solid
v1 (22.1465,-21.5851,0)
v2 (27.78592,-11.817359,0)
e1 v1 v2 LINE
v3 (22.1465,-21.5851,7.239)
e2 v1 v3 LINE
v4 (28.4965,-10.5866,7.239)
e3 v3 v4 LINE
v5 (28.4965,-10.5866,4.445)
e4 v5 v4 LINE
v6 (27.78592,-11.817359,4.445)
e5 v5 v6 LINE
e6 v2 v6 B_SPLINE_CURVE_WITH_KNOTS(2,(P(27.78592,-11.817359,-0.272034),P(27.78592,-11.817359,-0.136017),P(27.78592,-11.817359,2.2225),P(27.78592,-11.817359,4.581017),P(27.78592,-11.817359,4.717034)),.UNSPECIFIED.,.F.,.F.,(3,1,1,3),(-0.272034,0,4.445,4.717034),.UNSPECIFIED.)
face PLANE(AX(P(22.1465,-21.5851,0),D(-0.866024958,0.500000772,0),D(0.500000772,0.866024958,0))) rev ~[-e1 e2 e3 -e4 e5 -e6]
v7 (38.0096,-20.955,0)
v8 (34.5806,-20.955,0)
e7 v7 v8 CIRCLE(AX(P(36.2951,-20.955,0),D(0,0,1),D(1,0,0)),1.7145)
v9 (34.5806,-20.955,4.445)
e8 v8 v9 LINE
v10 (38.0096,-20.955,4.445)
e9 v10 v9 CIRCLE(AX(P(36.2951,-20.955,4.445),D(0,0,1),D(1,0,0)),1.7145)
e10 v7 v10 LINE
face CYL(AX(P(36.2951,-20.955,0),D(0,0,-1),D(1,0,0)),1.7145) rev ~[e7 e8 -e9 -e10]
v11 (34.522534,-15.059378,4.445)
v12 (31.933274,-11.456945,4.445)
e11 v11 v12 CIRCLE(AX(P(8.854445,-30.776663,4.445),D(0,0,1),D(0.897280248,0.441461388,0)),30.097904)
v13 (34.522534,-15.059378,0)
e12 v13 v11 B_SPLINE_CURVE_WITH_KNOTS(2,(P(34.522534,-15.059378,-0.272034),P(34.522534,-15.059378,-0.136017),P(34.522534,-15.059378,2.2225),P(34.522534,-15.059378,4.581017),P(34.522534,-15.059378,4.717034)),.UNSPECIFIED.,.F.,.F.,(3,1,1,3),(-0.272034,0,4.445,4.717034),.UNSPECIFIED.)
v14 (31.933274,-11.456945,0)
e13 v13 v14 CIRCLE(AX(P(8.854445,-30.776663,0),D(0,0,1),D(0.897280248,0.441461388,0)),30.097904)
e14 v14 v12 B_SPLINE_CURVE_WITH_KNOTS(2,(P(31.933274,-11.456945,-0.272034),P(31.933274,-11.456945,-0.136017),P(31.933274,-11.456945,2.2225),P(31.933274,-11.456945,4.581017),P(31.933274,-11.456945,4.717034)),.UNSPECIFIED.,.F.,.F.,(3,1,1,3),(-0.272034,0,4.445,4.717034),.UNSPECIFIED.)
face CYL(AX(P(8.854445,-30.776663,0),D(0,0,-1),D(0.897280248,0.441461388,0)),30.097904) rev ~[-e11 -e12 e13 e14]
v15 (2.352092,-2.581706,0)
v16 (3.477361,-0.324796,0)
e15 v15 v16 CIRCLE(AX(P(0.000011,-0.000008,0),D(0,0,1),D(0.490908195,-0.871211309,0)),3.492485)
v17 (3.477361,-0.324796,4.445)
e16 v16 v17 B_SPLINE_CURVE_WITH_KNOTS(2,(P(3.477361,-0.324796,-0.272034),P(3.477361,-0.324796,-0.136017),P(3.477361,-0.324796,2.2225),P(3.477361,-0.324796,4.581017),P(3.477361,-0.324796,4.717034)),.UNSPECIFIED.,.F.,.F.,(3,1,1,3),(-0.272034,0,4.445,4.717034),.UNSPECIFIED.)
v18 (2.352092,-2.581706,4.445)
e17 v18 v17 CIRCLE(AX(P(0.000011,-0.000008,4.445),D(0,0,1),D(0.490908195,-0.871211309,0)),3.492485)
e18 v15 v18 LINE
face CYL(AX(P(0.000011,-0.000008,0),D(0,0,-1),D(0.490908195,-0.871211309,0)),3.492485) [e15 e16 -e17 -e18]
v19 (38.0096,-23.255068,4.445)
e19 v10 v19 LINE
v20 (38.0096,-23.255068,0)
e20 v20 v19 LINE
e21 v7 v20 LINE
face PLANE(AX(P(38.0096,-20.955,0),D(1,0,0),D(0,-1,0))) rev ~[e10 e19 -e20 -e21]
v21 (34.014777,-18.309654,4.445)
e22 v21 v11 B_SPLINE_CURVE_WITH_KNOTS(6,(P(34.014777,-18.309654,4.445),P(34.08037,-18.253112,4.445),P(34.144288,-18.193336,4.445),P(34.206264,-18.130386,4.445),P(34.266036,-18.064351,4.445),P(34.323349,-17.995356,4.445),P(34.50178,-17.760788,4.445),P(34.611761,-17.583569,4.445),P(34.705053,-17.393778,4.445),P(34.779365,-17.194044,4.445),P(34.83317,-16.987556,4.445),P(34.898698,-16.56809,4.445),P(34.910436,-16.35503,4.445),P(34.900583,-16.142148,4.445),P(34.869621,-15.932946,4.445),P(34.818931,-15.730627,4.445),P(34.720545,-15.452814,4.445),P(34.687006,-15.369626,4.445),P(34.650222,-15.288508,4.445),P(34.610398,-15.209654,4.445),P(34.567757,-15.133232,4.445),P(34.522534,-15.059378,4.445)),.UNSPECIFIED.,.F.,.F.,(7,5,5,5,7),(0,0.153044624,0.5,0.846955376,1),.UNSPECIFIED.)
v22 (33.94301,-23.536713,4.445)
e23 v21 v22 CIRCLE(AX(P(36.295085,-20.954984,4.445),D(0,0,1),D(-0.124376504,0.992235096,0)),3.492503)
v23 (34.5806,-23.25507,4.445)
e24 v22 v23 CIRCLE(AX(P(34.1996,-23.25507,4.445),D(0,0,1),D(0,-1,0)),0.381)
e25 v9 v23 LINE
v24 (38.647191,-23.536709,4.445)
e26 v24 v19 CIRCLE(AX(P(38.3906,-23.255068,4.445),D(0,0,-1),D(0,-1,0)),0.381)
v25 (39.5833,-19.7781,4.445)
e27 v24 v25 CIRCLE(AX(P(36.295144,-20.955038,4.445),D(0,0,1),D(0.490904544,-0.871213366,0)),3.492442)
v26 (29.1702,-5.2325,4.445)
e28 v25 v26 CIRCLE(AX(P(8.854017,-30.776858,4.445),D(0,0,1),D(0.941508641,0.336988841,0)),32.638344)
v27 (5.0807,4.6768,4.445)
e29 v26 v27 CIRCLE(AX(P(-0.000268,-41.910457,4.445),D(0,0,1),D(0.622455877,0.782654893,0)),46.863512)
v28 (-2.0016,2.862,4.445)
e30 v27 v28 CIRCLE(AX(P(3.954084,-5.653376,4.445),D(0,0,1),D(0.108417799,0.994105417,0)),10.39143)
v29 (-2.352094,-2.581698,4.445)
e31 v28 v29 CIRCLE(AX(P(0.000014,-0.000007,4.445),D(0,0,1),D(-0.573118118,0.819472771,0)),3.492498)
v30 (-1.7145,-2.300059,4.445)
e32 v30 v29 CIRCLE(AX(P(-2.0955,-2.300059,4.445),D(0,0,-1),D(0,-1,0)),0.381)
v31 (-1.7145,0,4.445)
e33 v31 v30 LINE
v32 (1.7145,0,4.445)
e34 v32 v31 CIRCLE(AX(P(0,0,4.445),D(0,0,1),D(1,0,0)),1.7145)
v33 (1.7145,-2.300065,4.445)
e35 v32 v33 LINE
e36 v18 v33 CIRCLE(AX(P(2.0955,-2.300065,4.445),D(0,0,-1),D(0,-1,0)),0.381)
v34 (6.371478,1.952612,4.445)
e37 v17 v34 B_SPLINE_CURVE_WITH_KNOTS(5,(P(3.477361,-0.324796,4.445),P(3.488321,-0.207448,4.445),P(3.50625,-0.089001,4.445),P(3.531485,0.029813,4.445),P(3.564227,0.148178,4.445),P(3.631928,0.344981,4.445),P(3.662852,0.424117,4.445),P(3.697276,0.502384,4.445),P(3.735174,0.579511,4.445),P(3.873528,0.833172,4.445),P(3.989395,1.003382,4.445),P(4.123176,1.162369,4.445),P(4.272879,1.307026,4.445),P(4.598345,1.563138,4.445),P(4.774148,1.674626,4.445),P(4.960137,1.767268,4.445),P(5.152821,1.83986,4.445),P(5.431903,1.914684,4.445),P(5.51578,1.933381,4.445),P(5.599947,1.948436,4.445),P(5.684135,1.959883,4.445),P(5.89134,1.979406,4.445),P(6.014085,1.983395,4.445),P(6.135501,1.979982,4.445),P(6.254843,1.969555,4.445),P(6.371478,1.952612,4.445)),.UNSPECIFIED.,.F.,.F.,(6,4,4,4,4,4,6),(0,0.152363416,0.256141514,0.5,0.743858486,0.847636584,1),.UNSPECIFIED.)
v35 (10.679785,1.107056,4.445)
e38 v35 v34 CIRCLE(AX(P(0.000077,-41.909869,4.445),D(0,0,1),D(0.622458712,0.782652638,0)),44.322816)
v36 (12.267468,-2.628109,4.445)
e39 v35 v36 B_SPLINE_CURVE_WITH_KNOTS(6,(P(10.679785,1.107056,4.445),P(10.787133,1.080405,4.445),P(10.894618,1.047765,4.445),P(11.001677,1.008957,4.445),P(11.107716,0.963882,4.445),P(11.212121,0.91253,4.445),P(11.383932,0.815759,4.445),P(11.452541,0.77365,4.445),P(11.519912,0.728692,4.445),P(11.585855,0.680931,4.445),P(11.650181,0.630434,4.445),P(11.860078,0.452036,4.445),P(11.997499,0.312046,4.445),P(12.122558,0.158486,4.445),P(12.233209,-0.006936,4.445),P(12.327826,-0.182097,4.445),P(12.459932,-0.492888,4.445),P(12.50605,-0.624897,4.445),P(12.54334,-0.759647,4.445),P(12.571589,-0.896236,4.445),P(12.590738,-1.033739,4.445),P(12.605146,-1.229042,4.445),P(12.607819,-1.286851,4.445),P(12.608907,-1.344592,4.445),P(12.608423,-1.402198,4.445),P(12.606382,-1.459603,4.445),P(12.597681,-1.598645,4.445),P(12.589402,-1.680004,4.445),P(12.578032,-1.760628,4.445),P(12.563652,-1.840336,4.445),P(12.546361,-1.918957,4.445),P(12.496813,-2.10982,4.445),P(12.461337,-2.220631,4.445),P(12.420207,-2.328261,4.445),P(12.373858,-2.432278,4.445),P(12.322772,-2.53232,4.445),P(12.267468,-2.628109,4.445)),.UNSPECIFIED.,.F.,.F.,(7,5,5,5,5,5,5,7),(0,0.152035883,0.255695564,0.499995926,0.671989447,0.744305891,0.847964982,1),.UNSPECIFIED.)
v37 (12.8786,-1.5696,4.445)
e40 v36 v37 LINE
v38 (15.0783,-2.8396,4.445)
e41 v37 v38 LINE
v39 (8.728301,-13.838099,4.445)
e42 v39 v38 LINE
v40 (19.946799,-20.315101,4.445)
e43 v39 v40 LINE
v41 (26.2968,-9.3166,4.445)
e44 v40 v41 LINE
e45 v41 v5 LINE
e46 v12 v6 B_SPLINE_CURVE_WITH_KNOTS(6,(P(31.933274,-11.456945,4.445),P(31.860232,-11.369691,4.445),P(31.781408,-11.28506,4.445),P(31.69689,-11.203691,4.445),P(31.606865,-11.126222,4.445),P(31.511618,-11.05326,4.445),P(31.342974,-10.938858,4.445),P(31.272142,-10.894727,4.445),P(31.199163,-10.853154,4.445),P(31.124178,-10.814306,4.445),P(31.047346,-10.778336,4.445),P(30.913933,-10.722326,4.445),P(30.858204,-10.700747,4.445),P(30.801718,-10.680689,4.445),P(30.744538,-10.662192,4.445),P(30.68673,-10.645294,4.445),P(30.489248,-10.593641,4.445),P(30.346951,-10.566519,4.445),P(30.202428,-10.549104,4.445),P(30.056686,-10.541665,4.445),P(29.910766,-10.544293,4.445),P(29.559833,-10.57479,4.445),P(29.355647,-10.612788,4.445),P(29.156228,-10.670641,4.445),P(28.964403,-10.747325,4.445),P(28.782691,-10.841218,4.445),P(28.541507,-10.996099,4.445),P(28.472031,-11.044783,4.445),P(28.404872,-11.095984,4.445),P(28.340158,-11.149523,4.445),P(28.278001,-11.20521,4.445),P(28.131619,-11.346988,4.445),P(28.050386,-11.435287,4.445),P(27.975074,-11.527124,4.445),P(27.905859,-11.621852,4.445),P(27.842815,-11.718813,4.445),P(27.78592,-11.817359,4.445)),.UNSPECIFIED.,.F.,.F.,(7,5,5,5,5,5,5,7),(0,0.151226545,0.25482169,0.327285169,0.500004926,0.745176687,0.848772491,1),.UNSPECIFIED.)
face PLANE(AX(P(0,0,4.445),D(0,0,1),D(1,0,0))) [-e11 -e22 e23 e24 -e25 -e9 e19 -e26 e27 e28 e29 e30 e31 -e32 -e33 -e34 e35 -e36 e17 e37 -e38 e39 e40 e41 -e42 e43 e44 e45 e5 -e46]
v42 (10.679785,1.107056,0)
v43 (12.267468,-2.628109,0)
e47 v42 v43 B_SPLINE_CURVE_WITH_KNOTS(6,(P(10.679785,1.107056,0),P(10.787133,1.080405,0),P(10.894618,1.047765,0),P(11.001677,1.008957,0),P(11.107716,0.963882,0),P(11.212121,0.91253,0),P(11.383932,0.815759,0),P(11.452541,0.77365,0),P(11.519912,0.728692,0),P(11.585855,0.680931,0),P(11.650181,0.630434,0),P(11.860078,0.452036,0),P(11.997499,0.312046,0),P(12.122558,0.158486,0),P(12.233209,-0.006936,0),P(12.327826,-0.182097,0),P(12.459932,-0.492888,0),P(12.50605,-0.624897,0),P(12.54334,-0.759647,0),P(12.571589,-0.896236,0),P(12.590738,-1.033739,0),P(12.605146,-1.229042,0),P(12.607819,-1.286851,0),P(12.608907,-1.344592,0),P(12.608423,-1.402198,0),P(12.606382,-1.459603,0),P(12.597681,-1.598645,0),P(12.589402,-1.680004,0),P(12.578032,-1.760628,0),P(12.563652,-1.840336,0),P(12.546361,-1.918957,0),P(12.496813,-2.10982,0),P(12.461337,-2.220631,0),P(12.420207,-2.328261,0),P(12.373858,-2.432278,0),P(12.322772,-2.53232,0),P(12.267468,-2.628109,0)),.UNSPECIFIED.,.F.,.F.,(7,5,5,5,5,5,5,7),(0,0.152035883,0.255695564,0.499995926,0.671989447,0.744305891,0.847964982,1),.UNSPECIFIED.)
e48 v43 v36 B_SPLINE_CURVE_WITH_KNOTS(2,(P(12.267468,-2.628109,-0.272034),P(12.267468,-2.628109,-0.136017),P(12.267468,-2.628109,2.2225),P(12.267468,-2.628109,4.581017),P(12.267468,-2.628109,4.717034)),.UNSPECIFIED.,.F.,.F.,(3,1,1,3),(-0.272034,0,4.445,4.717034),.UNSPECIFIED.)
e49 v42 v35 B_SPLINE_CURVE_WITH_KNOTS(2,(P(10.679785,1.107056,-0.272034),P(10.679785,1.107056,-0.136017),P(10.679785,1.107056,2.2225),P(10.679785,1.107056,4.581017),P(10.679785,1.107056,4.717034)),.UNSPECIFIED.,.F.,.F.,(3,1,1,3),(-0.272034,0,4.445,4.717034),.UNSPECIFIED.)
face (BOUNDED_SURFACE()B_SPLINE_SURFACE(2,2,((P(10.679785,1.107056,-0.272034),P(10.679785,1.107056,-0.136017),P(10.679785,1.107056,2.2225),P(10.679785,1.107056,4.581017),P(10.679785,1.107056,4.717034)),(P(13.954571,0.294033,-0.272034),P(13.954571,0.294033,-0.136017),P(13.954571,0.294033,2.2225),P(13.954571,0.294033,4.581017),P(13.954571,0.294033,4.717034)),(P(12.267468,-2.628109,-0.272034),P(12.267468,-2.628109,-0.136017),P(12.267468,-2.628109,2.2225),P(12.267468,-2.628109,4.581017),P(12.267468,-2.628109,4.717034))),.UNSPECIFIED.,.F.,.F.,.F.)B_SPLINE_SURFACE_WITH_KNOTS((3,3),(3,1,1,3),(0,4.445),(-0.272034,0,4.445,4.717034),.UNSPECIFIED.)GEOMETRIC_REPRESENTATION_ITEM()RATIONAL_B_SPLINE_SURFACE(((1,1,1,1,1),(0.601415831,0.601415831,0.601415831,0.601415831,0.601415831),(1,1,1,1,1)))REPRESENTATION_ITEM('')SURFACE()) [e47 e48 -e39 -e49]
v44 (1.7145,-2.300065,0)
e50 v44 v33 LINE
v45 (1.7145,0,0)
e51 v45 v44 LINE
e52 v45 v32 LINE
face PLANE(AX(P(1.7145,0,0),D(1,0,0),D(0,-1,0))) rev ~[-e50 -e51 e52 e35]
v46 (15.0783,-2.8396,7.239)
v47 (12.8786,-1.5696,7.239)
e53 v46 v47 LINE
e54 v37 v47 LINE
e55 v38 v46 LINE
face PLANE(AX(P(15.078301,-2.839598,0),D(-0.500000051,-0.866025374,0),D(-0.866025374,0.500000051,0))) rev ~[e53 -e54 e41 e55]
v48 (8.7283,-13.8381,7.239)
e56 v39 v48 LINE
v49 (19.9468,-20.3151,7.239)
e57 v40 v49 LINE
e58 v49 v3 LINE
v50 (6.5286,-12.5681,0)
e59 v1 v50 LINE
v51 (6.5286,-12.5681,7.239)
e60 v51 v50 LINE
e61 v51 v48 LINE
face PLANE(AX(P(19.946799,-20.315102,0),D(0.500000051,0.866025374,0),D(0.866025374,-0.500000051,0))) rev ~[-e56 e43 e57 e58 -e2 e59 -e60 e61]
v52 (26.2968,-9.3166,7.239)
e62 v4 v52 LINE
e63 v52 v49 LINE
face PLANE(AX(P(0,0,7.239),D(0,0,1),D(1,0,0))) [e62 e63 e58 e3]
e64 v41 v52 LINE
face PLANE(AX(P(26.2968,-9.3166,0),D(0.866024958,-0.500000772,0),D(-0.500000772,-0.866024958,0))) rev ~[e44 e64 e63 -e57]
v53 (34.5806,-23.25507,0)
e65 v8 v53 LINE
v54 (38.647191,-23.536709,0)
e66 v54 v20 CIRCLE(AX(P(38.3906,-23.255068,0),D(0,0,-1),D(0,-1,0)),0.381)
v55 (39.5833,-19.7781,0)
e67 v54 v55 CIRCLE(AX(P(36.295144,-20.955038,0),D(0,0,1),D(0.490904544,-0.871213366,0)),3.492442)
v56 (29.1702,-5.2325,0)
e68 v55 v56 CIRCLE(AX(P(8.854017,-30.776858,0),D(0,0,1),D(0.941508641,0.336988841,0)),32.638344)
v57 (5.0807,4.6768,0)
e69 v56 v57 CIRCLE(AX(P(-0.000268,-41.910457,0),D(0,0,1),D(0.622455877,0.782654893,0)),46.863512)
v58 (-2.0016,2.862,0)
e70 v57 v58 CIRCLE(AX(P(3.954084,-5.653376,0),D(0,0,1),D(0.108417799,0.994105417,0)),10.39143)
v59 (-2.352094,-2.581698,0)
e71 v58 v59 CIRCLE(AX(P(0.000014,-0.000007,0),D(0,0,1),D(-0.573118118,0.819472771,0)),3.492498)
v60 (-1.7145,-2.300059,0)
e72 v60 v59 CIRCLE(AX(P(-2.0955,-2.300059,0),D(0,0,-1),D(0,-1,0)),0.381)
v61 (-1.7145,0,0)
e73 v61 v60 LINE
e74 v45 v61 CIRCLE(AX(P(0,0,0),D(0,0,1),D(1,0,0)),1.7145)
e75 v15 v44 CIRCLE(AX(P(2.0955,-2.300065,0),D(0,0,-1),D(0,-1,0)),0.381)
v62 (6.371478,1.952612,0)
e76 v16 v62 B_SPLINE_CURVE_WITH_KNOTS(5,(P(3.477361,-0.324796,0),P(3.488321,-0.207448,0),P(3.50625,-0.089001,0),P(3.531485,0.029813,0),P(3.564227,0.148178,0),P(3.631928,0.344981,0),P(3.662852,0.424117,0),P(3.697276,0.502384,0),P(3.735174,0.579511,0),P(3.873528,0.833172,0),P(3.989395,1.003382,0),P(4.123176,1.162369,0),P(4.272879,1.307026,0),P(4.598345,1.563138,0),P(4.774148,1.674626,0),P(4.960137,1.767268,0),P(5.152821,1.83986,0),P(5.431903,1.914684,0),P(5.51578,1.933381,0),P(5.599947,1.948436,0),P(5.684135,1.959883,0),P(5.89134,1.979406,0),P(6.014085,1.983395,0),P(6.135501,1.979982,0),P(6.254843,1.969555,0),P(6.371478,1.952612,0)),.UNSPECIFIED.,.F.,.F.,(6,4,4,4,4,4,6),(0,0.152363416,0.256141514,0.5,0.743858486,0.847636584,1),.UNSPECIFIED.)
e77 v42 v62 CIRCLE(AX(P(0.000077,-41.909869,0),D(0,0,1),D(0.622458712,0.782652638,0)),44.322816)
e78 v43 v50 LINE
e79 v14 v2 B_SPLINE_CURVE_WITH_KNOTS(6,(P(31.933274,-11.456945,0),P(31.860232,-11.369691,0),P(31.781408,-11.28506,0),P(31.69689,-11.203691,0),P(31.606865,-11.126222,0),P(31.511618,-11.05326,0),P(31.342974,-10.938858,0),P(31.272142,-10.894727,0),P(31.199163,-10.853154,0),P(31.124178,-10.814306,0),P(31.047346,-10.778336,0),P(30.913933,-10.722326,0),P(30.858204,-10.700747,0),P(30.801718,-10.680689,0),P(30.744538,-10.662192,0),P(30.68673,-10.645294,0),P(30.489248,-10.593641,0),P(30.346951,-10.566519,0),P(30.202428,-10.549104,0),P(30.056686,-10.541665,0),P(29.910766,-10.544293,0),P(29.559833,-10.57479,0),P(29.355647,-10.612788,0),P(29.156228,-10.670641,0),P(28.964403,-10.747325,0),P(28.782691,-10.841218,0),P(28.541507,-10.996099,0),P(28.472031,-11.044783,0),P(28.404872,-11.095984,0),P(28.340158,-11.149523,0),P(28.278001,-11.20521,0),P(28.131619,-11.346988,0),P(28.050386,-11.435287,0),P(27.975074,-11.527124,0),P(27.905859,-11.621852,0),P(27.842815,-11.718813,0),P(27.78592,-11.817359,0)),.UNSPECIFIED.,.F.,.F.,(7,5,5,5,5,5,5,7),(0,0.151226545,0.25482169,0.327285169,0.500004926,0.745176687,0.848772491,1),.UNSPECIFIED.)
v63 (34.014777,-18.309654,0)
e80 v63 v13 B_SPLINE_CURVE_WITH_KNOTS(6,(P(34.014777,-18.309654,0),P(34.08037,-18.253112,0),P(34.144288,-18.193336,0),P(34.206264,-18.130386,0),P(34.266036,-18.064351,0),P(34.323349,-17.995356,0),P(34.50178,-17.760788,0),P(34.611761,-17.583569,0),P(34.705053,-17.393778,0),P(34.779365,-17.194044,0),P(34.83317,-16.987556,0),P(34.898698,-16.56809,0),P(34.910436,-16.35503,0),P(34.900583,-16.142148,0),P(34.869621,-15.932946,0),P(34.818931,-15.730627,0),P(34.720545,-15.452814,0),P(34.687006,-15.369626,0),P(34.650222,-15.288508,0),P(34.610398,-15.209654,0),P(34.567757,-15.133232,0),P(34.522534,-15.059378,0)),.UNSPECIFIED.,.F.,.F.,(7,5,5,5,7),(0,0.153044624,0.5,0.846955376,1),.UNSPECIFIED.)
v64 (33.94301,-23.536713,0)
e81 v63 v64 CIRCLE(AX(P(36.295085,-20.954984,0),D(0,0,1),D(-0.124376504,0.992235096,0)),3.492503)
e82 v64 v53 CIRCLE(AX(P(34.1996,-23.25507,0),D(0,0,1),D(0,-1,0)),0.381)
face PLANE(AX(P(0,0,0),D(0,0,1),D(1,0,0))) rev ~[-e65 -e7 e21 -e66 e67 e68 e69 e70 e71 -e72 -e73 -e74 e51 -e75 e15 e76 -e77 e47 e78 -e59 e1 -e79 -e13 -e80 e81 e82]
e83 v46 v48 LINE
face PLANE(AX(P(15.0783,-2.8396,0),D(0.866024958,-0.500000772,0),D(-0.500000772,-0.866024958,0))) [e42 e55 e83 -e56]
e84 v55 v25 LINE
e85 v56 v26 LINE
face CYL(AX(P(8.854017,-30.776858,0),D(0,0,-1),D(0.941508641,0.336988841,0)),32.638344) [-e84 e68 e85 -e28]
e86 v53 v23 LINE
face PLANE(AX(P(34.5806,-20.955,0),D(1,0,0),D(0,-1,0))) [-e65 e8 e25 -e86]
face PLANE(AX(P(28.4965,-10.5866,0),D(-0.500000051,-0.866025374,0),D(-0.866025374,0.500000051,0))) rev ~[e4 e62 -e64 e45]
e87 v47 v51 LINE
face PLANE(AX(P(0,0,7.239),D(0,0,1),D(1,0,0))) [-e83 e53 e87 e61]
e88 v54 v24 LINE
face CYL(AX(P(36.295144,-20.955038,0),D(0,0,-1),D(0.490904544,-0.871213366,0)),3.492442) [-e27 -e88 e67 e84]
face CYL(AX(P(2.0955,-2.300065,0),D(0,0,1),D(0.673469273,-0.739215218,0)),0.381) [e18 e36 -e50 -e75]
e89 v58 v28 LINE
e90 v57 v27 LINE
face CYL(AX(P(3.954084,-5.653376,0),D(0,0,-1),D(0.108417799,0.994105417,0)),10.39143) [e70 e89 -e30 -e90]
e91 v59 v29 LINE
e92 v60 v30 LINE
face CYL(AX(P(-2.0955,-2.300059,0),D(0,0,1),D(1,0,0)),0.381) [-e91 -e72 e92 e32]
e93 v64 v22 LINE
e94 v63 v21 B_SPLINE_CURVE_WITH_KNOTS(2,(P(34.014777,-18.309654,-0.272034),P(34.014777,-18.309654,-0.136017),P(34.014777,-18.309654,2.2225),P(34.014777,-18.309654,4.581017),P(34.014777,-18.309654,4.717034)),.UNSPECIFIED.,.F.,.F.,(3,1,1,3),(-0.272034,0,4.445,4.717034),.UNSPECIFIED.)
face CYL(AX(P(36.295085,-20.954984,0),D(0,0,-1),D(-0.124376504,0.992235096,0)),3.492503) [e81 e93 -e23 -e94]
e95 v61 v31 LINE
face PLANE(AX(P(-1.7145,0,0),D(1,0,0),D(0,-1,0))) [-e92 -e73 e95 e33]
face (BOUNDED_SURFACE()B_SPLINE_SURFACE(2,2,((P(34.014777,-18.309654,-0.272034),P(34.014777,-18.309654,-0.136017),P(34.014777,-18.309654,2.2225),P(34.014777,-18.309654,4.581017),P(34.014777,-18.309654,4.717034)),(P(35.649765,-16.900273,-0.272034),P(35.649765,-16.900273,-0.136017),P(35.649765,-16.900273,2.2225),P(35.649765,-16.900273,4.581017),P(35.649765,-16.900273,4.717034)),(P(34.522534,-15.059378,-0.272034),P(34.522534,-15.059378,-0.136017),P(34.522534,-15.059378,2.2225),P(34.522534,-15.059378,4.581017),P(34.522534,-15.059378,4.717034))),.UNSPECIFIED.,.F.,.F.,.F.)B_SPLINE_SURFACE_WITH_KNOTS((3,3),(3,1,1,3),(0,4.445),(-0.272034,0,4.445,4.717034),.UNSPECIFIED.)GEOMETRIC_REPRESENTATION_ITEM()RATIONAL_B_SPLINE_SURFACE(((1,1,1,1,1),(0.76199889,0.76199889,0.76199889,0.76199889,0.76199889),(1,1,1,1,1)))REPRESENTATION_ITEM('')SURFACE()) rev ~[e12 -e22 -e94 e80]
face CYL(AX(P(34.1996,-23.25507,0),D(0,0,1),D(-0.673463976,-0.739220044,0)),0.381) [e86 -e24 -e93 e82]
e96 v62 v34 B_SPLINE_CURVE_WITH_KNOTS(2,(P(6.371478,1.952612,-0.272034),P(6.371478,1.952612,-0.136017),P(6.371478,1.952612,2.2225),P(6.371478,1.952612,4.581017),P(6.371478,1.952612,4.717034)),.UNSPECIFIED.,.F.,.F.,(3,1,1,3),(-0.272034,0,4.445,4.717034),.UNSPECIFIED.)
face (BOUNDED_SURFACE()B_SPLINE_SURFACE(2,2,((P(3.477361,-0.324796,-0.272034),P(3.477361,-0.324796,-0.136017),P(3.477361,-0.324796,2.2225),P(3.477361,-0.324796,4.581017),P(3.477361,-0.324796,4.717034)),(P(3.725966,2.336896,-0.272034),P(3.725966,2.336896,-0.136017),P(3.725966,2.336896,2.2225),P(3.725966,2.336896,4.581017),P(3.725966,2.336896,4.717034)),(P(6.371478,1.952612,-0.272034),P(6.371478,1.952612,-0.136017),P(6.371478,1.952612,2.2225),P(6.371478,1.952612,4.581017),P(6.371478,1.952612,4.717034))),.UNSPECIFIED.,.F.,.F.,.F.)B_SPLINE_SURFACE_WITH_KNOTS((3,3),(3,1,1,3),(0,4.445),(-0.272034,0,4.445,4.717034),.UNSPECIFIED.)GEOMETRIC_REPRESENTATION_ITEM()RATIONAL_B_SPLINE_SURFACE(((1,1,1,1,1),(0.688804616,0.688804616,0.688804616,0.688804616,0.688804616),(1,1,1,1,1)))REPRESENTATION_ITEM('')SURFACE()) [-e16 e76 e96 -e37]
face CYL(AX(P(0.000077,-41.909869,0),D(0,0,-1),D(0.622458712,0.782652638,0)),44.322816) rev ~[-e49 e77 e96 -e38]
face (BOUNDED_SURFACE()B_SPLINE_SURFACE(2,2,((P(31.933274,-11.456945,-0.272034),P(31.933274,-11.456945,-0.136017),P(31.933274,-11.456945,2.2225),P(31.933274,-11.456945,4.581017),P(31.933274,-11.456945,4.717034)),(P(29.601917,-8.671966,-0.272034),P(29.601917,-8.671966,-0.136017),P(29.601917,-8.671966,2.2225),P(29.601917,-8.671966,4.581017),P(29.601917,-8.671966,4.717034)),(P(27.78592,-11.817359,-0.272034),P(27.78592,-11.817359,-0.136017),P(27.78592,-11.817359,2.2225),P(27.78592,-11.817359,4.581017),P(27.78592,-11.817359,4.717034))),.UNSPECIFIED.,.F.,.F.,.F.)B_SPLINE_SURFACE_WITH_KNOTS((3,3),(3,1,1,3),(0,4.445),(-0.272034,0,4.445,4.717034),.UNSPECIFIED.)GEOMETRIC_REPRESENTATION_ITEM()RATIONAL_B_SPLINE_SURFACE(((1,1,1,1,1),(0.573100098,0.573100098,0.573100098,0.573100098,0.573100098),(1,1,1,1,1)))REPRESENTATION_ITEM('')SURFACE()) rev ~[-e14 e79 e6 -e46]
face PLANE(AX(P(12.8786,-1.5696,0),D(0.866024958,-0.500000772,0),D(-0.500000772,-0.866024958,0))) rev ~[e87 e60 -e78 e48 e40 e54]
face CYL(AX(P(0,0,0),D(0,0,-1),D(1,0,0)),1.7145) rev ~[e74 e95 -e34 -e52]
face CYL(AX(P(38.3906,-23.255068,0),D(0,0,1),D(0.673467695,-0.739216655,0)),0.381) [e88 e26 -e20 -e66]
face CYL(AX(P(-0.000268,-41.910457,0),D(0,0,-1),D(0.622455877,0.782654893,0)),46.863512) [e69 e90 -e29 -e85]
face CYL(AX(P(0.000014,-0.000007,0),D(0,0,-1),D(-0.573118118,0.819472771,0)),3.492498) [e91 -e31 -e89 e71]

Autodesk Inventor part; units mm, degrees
ref_plane "YZ Plane" through (0, 0, 0) normal (1, 0, 0) x (0, 1, 0)
ref_plane "XZ Plane" through (0, 0, 0) normal (0, 1, 0) x (-1, 0, 0)
ref_plane "XY Plane" through (0, 0, 0) normal (0, 0, 1) x (1, 0, 0)
sketch "Sketch1" plane through (0, 0, 0) normal (0, 0, 1) x (1, 0, 0)
  arc A0 (1.7145, 0) -> (-1.7145, 0) centre (0, 0) ccw
  arc A1 (38.0096, -20.955) -> (34.5806, -20.955) centre (36.2951, -20.955) ccw
  line L0 (0, 0) -> (36.5724, 0) construction
  line L1 (-1.7145, 0) -> (-1.7145, -3.0427)
  line L2 (1.7145, 0) -> (1.7145, -3.0427)
  line L3 (34.5806, -20.955) -> (34.5806, -23.9977)
  line L4 (38.0096, -20.955) -> (38.0096, -23.9977)
  line L5 (0, 0) -> (0, -41.91) construction
  arc A2 (29.1702, -5.2325) -> (5.0807, 4.6768) centre (0, -41.91) ccw
  arc A3 (5.0807, 4.6768) -> (-2.0016, 2.862) centre (3.9541, -5.6536) ccw
  arc A4 (39.5833, -19.7781) -> (29.1702, -5.2325) centre (8.8547, -30.7765) ccw
  arc A5 (4.8053, 2.1517) -> (2.7829, 2.1102) centre (3.9541, -5.6536) ccw
  arc A6 (27.5892, -7.2205) -> (4.8053, 2.1517) centre (0, -41.91) ccw
  arc A7 (35.8607, -17.4896) -> (27.5892, -7.2205) centre (8.8547, -30.7765) ccw
  arc A8 (35.8607, -17.4896) -> (34.5806, -23.9977) centre (36.2951, -20.955) ccw
  arc A9 (38.0096, -23.9977) -> (39.5833, -19.7781) centre (36.2951, -20.955) ccw
  arc A10 (-2.0016, 2.862) -> (-1.7145, -3.0427) centre (0, 0) ccw
  arc A11 (1.7145, -3.0427) -> (2.7829, 2.1102) centre (0, 0) ccw
  line L6 (0, 0) -> (36.2951, -20.955) construction
  line L7 (12.8786, -1.5696) -> (6.5286, -12.5681)
  line L8 (6.5286, -12.5681) -> (22.1465, -21.5851)
  line L9 (22.1465, -21.5851) -> (28.4965, -10.5866)
  line L10 (28.4965, -10.5866) -> (12.8786, -1.5696)
  line L11 (28.4965, -10.5866) -> (36.2951, -20.955) construction
  line L12 (12.8786, -1.5696) -> (0, 0) construction
  line L13 (12.8786, -1.5696) -> (13.8891, 0.1806)
  line L14 (28.4965, -10.5866) -> (29.4898, -8.8662)
  line L15 (15.0783, -2.8396) -> (8.7283, -13.8381)
  line L16 (26.2968, -9.3166) -> (19.9468, -20.3151)
  dimension "d0" = 3.429
  dimension "d1" = 30
  dimension "d3" = 41.91
  dimension "d4" = 93.726
  dimension "d6" = 2.54
  dimension "d7" = 5.08
  dimension "d8" = 18.034
  dimension "d9" = 41.91
  dimension "d10" = 6.985
  dimension "d11" = 12.7
  dimension "d12" = 2.54
  dimension "d13" = 2.54
  dimension "d14" = 3.429
  dimension "d15" = 3.4925
extrude "Extrusion1" add sketch "Sketch1" along normal blind 4.445
fillet "Fillet1" radius 2.54 4 edges at (2.7829, 2.1102, 2.2225) (35.8607, -17.4896, 2.2225) (29.4898, -8.8662, 2.2225) (13.8891, 0.1806, 2.2225)
fillet "Fillet2" radius 0.381 4 edges at (-1.7145, -3.0427, 2.2225) (1.7145, -3.0427, 2.2225) (34.5806, -23.9977, 2.2225) (38.0096, -23.9977, 2.2225)
extrude "Extrusion2" add sketch "Sketch1" along normal blind 7.239 contours L10 L15 L8 L7 | L9 L8 L16 L10
properties part number "USBBreakoutHolder"
